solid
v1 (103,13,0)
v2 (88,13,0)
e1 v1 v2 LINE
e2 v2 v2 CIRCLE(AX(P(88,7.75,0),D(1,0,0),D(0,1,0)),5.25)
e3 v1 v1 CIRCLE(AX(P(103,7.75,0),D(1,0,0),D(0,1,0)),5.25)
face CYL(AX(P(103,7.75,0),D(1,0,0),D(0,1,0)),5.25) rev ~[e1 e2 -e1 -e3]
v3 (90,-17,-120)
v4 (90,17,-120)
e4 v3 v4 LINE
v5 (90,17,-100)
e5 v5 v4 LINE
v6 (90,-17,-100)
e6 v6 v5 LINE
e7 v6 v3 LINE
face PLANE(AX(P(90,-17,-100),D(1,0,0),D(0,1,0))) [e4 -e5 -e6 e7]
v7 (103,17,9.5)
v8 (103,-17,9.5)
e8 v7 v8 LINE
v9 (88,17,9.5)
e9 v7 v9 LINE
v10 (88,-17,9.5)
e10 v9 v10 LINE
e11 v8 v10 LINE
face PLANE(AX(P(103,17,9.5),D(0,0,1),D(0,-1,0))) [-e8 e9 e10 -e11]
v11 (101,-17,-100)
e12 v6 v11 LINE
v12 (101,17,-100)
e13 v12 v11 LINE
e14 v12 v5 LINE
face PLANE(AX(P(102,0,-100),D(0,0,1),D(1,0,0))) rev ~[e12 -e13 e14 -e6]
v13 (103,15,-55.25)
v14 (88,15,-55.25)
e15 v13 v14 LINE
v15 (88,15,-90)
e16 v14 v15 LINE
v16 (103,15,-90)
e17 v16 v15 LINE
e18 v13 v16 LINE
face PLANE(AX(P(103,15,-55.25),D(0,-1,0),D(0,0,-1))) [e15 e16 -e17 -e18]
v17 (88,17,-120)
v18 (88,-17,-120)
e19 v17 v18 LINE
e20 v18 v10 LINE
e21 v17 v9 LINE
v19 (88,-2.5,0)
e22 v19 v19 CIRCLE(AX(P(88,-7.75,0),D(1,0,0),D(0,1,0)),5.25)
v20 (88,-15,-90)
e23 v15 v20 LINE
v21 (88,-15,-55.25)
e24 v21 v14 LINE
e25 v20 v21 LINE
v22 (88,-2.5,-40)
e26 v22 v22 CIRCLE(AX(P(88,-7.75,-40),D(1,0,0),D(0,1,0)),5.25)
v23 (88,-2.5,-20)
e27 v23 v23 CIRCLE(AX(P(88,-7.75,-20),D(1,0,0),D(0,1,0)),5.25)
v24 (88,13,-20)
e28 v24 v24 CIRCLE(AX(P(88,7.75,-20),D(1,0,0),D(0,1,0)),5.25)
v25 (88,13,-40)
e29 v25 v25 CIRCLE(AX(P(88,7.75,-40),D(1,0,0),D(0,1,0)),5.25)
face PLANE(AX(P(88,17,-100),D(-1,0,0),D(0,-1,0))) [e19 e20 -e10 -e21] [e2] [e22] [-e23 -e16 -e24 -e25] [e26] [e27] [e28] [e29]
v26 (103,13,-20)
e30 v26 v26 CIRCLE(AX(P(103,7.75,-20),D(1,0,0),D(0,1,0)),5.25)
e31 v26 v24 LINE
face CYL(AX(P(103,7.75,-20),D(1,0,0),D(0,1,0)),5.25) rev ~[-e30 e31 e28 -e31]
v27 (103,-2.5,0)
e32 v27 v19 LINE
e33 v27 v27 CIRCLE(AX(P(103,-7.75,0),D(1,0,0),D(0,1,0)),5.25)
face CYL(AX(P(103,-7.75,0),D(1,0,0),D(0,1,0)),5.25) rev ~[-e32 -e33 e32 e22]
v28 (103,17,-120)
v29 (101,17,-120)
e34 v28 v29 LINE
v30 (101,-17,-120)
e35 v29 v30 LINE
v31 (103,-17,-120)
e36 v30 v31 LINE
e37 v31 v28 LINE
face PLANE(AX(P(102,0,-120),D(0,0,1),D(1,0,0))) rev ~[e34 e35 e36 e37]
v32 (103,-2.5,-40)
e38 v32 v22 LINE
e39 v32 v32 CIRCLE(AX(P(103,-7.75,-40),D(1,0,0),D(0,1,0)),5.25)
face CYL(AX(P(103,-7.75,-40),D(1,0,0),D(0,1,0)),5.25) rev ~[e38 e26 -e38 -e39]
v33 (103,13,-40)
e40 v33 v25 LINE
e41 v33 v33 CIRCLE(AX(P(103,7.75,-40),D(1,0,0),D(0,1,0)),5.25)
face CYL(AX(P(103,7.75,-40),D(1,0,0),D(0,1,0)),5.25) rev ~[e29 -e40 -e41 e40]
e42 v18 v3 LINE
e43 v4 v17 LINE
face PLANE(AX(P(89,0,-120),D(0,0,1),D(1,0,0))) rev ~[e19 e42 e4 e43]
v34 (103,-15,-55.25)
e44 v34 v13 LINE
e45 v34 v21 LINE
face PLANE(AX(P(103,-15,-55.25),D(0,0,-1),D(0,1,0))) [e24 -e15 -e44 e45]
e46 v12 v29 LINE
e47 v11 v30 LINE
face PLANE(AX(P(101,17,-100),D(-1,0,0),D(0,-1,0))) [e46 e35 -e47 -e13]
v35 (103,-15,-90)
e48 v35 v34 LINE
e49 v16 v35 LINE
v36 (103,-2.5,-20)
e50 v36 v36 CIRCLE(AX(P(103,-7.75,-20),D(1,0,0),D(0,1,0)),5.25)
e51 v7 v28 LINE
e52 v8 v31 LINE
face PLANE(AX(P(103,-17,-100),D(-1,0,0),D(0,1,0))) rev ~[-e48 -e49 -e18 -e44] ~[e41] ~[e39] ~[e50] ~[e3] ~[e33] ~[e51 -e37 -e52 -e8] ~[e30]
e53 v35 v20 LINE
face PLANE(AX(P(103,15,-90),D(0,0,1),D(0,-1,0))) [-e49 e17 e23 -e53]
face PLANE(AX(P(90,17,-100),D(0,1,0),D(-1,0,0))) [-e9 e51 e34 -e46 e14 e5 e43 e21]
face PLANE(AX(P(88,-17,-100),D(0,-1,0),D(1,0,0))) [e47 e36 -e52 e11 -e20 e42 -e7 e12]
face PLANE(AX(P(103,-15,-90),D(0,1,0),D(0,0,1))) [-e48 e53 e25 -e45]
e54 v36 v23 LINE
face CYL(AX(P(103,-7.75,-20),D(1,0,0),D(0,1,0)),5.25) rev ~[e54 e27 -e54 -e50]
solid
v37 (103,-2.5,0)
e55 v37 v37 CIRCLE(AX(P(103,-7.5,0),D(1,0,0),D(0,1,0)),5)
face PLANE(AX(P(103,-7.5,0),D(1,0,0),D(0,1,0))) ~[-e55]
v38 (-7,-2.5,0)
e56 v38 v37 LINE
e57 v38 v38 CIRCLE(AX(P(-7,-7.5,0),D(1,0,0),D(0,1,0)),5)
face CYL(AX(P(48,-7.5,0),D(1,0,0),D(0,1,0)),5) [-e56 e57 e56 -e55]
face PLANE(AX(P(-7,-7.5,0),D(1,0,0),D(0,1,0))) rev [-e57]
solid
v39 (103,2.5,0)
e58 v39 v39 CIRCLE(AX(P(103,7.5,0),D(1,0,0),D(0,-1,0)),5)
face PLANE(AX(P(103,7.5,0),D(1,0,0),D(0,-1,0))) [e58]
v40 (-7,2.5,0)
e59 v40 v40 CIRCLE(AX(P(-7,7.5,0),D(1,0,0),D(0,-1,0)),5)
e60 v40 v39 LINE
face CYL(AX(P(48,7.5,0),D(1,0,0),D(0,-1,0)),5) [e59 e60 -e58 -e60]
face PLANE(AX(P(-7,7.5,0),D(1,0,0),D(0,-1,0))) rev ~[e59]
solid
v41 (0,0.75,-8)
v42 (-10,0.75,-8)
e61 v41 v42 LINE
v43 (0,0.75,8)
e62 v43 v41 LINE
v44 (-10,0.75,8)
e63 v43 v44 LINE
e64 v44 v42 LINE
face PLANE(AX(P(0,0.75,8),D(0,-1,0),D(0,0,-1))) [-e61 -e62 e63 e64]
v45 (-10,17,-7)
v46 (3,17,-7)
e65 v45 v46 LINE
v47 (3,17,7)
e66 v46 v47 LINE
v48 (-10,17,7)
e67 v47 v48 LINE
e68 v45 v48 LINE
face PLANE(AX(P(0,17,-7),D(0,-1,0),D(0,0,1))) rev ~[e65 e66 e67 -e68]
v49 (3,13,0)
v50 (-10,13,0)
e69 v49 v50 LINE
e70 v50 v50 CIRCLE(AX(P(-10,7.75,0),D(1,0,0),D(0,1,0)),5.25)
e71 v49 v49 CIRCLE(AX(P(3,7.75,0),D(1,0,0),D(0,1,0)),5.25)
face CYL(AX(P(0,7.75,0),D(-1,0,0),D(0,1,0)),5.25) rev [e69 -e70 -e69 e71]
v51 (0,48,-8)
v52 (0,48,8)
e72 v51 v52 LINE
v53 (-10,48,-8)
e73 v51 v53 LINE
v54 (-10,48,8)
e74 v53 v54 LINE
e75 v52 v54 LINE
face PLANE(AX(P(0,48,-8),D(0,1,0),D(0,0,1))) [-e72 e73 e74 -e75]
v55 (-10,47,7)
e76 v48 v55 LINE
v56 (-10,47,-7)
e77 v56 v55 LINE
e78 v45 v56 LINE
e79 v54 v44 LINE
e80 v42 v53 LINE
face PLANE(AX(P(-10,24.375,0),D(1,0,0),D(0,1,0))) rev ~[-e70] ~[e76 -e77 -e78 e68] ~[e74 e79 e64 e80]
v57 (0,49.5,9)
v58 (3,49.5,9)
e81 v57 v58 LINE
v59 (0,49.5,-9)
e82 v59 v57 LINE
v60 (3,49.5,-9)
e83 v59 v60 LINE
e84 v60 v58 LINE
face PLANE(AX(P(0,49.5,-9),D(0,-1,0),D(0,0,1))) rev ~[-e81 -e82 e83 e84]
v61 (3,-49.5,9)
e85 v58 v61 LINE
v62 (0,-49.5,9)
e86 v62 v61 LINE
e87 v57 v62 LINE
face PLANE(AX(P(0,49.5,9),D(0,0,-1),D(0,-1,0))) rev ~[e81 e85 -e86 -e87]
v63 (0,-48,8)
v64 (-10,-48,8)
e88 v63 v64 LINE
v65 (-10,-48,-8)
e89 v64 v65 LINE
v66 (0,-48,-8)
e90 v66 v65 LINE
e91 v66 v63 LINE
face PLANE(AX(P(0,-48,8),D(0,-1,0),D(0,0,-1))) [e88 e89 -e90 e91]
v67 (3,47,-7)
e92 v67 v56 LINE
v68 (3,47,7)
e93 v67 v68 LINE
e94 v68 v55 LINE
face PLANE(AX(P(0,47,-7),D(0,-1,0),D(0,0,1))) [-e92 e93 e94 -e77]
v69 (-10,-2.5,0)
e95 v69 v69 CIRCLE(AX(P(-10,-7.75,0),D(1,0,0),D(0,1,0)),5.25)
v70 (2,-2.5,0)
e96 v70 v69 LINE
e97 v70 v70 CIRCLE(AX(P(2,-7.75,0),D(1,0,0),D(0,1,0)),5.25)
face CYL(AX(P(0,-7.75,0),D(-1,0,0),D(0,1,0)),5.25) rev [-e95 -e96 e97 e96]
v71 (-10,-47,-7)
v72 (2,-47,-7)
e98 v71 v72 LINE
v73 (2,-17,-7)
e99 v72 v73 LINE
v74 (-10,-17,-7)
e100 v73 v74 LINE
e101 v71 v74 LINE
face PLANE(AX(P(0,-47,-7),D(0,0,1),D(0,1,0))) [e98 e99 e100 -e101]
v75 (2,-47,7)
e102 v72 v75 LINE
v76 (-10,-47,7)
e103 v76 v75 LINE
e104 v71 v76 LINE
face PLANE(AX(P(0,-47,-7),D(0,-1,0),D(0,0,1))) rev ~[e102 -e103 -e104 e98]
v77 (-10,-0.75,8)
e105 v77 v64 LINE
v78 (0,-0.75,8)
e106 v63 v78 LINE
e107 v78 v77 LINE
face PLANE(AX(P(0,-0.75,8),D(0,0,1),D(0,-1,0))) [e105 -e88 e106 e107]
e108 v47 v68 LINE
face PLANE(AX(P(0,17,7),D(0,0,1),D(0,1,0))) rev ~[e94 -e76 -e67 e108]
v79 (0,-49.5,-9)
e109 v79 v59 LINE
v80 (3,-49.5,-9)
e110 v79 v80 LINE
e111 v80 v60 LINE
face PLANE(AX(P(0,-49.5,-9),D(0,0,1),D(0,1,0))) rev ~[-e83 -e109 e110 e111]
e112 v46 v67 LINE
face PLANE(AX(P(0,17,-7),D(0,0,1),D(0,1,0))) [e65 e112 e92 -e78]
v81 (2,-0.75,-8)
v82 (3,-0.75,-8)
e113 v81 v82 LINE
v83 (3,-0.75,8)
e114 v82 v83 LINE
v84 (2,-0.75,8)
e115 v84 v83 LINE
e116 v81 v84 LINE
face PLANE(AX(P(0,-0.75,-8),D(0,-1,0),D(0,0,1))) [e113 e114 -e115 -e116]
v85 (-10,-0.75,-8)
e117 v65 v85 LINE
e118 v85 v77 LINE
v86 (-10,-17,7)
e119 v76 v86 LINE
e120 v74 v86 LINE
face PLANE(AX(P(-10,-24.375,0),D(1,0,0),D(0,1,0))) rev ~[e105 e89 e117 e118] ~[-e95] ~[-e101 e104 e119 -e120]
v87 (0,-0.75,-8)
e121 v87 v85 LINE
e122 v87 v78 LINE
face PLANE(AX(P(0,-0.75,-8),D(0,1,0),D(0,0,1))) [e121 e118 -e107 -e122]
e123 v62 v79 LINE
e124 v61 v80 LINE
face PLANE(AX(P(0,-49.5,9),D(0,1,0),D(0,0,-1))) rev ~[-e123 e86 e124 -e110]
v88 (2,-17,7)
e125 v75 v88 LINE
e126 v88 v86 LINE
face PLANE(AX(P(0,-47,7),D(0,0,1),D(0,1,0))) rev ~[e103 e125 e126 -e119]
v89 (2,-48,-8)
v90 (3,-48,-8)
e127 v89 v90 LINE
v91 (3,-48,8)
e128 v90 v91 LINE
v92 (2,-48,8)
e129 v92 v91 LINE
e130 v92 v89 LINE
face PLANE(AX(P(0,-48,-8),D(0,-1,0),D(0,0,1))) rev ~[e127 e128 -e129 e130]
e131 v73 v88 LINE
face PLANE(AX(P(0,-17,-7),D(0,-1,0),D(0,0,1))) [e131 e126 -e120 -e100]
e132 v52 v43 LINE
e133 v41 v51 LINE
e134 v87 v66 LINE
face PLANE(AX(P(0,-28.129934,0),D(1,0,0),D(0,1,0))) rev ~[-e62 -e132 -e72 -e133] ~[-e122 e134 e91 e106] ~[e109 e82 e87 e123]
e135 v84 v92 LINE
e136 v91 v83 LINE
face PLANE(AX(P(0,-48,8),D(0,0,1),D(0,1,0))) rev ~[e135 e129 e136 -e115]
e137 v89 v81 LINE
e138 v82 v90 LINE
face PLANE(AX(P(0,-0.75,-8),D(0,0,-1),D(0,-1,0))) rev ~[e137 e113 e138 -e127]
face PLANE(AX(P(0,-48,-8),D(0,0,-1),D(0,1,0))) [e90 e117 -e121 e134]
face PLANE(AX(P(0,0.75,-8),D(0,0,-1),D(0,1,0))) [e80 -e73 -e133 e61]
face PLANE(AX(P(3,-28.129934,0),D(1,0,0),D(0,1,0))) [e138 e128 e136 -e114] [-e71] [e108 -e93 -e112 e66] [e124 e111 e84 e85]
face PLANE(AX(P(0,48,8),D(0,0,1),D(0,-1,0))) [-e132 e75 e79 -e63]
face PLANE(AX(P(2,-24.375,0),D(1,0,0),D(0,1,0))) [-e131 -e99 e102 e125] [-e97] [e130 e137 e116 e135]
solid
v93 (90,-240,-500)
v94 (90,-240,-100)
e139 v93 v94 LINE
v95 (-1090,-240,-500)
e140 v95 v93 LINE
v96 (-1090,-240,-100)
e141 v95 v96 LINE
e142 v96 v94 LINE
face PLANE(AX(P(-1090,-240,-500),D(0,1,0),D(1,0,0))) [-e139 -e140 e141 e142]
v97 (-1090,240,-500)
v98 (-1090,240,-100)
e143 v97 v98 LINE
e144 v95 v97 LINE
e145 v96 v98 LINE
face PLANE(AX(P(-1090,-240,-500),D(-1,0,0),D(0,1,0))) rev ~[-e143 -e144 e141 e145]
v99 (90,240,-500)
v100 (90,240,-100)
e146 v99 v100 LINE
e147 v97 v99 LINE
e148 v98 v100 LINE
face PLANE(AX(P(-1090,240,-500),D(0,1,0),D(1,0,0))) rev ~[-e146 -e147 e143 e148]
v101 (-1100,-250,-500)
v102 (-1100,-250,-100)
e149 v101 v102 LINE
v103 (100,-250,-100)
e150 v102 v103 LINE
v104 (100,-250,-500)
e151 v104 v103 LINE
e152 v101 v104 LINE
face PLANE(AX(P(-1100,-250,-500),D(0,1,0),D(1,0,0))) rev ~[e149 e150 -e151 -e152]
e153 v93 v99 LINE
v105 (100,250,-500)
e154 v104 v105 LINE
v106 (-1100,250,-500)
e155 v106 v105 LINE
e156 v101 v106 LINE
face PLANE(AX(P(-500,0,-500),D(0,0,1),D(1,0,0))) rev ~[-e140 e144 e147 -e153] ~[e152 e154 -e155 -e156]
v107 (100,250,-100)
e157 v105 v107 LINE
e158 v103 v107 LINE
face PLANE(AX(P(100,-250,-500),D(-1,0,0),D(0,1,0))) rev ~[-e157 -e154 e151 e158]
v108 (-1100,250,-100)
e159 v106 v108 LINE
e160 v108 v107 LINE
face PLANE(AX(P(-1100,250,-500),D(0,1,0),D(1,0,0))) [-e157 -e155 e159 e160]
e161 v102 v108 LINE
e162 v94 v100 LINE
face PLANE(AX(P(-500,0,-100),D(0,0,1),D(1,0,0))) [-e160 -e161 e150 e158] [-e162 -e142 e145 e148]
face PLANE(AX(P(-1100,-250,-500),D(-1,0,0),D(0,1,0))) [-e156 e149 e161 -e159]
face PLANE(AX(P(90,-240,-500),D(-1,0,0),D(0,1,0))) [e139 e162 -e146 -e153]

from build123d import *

# Parameters (mm, degrees)
F0_W          = 1.5
F0_H          = 1
F0_H_2        = 16
F0_R          = 5.25
F0_W_2        = 30
F0_H_3        = 14
F1_DEPTH      = 3
F2_DEPTH      = 10
F2_DEPTH_BACK = 2
F5_W          = 1200
F5_H          = 500
F5_W_2        = 1180
F5_H_2        = 480
F6_DEPTH      = 400
F7_W          = 10
F7_H          = 2
F7_W_2        = 1
F7_H_2        = 30
F8_DEPTH      = 10
F9_DEPTH      = 20
F10_R         = 5.25
F11_DEPTH     = 15
F12_W         = 110
F12_H         = 5


# Not quite as in the source:
# - a feature names something its author has since deleted; it is built from what else it names
# - the program builds the solid bodies; features that only make, move or delete a surface that nothing else refers to are left out


with BuildPart() as f1:
    # F0 (on Right) → F1 (new body)
    with BuildSketch(Plane.YZ):
        Polygon((-0.75, 9), (-49.5, 9), (-49.5, -9), (-0.75, -9), (-0.75, -8), (-13, -8), (-16, -8), (-48, -8), (-48, 8), (-16, 8), (-13, 8), (-0.75, 8), align=None)
        with Locations((0, 8.5)):
            Rectangle(F0_W, F0_H)
        Polygon((49.5, 9), (0.75, 9), (0.75, 8), (13, 8), (16, 8), (48, 8), (48, -8), (16, -8), (13, -8), (0.75, -8), (0.75, -9), (49.5, -9), align=None)
        with Locations((0, -8.5)):
            Rectangle(F0_W, F0_H)
        Rectangle(F0_W, F0_H_2)
        Polygon((13, 8), (0.75, 8), (0.75, -8), (13, -8), (16, -8), (48, -8), (48, 8), (16, 8), align=None)
        with Locations((7.75, 0)):
            Circle(F0_R, mode=Mode.SUBTRACT)
        with Locations((32, 0)):
            Rectangle(F0_W_2, F0_H_3, mode=Mode.SUBTRACT)
    extrude(amount=F1_DEPTH)

    # F0 (on Right) → F2 (join, two sides)
    with BuildSketch(Plane.YZ) as f2_sk:
        Polygon((-0.75, -8), (-0.75, 8), (-13, 8), (-16, 8), (-48, 8), (-48, -8), (-16, -8), (-13, -8), align=None)
        with Locations((-32, 0)):
            Rectangle(F0_W_2, F0_H_3, mode=Mode.SUBTRACT)
        with Locations((-7.75, 0)):
            Circle(F0_R, mode=Mode.SUBTRACT)
        Polygon((13, 8), (0.75, 8), (0.75, -8), (13, -8), (16, -8), (48, -8), (48, 8), (16, 8), align=None)
        with Locations((7.75, 0)):
            Circle(F0_R, mode=Mode.SUBTRACT)
        with Locations((32, 0)):
            Rectangle(F0_W_2, F0_H_3, mode=Mode.SUBTRACT)
    extrude(amount=-F2_DEPTH)
    extrude(f2_sk.sketch, amount=F2_DEPTH_BACK)


with BuildPart() as f6:
    # F5 (on offset) → F6 (new body)
    with BuildSketch(Plane.XY.offset(-500)):
        with Locations((-500, 0)):
            Rectangle(F5_W, F5_H)
        with Locations((-500, 0)):
            Rectangle(F5_W_2, F5_H_2, mode=Mode.SUBTRACT)
    extrude(amount=F6_DEPTH)


with BuildPart() as f8:
    # F7 (on face) → F8 (new body)
    with BuildSketch(Plane.XY.offset(-100)):
        Polygon((101, 17), (101, 15), (101, -15), (101, -17), (103, -17), (103, 17), align=None)
        Polygon((90, -15), (90, 15), (90, 17), (88, 17), (88, -17), (90, -17), align=None)
        with Locations((95, 16)):
            Rectangle(F7_W, F7_H)
        with Locations((100.5, 16)):
            Rectangle(F7_W_2, F7_H)
        with Locations((100.5, -16)):
            Rectangle(F7_W_2, F7_H)
        with Locations((95, -16)):
            Rectangle(F7_W, F7_H)
        with Locations((100.5, 0)):
            Rectangle(F7_W_2, F7_H_2)
        with Locations((95, 0)):
            Rectangle(F7_W, F7_H_2)
    extrude(amount=F8_DEPTH)

    # F7 (on face) → F9 (join)
    with BuildSketch(Plane.XY.offset(-100)):
        Polygon((90, -15), (90, 15), (90, 17), (88, 17), (88, -17), (90, -17), align=None)
        Polygon((101, 17), (101, 15), (101, -15), (101, -17), (103, -17), (103, 17), align=None)
    extrude(amount=-F9_DEPTH)

    # F10 (on face) → F11 (join)
    with BuildSketch(Plane.YZ.offset(103)):
        Polygon((-15, -90), (-17, -90), (-17, -100), (17, -100), (17, -90), (15, -90), align=None)
        Polygon((-17, 9.5), (-17, -90), (-15, -90), (-15, -55.25), (15, -55.25), (15, -90), (17, -90), (17, 9.5), align=None)
        with Locations((-7.75, -40)):
            Circle(F10_R, mode=Mode.SUBTRACT)
        with Locations((-7.75, -20)):
            Circle(F10_R, mode=Mode.SUBTRACT)
        with Locations((-7.75, 0)):
            Circle(F10_R, mode=Mode.SUBTRACT)
        with Locations((7.75, -40)):
            Circle(F10_R, mode=Mode.SUBTRACT)
        with Locations((7.75, -20)):
            Circle(F10_R, mode=Mode.SUBTRACT)
        with Locations((7.75, 0)):
            Circle(F10_R, mode=Mode.SUBTRACT)
    extrude(amount=-F11_DEPTH)


with BuildPart() as f13:
    # F12 (on Top) → F13 (revolve)
    with BuildSketch(Plane.XY):
        with Locations((48, -5)):
            Rectangle(F12_W, F12_H)
    revolve(axis=Axis((48, -7.5, 0), (1, 0, 0)))


with BuildPart() as f14:
    # F12 (on Top) → F14 (revolve)
    with BuildSketch(Plane.XY):
        with Locations((48, 5)):
            Rectangle(F12_W, F12_H)
    revolve(axis=Axis((48, 7.5, 0), (1, 0, 0)))


solid = Compound([f1.part, f6.part, f8.part, f13.part, f14.part])
